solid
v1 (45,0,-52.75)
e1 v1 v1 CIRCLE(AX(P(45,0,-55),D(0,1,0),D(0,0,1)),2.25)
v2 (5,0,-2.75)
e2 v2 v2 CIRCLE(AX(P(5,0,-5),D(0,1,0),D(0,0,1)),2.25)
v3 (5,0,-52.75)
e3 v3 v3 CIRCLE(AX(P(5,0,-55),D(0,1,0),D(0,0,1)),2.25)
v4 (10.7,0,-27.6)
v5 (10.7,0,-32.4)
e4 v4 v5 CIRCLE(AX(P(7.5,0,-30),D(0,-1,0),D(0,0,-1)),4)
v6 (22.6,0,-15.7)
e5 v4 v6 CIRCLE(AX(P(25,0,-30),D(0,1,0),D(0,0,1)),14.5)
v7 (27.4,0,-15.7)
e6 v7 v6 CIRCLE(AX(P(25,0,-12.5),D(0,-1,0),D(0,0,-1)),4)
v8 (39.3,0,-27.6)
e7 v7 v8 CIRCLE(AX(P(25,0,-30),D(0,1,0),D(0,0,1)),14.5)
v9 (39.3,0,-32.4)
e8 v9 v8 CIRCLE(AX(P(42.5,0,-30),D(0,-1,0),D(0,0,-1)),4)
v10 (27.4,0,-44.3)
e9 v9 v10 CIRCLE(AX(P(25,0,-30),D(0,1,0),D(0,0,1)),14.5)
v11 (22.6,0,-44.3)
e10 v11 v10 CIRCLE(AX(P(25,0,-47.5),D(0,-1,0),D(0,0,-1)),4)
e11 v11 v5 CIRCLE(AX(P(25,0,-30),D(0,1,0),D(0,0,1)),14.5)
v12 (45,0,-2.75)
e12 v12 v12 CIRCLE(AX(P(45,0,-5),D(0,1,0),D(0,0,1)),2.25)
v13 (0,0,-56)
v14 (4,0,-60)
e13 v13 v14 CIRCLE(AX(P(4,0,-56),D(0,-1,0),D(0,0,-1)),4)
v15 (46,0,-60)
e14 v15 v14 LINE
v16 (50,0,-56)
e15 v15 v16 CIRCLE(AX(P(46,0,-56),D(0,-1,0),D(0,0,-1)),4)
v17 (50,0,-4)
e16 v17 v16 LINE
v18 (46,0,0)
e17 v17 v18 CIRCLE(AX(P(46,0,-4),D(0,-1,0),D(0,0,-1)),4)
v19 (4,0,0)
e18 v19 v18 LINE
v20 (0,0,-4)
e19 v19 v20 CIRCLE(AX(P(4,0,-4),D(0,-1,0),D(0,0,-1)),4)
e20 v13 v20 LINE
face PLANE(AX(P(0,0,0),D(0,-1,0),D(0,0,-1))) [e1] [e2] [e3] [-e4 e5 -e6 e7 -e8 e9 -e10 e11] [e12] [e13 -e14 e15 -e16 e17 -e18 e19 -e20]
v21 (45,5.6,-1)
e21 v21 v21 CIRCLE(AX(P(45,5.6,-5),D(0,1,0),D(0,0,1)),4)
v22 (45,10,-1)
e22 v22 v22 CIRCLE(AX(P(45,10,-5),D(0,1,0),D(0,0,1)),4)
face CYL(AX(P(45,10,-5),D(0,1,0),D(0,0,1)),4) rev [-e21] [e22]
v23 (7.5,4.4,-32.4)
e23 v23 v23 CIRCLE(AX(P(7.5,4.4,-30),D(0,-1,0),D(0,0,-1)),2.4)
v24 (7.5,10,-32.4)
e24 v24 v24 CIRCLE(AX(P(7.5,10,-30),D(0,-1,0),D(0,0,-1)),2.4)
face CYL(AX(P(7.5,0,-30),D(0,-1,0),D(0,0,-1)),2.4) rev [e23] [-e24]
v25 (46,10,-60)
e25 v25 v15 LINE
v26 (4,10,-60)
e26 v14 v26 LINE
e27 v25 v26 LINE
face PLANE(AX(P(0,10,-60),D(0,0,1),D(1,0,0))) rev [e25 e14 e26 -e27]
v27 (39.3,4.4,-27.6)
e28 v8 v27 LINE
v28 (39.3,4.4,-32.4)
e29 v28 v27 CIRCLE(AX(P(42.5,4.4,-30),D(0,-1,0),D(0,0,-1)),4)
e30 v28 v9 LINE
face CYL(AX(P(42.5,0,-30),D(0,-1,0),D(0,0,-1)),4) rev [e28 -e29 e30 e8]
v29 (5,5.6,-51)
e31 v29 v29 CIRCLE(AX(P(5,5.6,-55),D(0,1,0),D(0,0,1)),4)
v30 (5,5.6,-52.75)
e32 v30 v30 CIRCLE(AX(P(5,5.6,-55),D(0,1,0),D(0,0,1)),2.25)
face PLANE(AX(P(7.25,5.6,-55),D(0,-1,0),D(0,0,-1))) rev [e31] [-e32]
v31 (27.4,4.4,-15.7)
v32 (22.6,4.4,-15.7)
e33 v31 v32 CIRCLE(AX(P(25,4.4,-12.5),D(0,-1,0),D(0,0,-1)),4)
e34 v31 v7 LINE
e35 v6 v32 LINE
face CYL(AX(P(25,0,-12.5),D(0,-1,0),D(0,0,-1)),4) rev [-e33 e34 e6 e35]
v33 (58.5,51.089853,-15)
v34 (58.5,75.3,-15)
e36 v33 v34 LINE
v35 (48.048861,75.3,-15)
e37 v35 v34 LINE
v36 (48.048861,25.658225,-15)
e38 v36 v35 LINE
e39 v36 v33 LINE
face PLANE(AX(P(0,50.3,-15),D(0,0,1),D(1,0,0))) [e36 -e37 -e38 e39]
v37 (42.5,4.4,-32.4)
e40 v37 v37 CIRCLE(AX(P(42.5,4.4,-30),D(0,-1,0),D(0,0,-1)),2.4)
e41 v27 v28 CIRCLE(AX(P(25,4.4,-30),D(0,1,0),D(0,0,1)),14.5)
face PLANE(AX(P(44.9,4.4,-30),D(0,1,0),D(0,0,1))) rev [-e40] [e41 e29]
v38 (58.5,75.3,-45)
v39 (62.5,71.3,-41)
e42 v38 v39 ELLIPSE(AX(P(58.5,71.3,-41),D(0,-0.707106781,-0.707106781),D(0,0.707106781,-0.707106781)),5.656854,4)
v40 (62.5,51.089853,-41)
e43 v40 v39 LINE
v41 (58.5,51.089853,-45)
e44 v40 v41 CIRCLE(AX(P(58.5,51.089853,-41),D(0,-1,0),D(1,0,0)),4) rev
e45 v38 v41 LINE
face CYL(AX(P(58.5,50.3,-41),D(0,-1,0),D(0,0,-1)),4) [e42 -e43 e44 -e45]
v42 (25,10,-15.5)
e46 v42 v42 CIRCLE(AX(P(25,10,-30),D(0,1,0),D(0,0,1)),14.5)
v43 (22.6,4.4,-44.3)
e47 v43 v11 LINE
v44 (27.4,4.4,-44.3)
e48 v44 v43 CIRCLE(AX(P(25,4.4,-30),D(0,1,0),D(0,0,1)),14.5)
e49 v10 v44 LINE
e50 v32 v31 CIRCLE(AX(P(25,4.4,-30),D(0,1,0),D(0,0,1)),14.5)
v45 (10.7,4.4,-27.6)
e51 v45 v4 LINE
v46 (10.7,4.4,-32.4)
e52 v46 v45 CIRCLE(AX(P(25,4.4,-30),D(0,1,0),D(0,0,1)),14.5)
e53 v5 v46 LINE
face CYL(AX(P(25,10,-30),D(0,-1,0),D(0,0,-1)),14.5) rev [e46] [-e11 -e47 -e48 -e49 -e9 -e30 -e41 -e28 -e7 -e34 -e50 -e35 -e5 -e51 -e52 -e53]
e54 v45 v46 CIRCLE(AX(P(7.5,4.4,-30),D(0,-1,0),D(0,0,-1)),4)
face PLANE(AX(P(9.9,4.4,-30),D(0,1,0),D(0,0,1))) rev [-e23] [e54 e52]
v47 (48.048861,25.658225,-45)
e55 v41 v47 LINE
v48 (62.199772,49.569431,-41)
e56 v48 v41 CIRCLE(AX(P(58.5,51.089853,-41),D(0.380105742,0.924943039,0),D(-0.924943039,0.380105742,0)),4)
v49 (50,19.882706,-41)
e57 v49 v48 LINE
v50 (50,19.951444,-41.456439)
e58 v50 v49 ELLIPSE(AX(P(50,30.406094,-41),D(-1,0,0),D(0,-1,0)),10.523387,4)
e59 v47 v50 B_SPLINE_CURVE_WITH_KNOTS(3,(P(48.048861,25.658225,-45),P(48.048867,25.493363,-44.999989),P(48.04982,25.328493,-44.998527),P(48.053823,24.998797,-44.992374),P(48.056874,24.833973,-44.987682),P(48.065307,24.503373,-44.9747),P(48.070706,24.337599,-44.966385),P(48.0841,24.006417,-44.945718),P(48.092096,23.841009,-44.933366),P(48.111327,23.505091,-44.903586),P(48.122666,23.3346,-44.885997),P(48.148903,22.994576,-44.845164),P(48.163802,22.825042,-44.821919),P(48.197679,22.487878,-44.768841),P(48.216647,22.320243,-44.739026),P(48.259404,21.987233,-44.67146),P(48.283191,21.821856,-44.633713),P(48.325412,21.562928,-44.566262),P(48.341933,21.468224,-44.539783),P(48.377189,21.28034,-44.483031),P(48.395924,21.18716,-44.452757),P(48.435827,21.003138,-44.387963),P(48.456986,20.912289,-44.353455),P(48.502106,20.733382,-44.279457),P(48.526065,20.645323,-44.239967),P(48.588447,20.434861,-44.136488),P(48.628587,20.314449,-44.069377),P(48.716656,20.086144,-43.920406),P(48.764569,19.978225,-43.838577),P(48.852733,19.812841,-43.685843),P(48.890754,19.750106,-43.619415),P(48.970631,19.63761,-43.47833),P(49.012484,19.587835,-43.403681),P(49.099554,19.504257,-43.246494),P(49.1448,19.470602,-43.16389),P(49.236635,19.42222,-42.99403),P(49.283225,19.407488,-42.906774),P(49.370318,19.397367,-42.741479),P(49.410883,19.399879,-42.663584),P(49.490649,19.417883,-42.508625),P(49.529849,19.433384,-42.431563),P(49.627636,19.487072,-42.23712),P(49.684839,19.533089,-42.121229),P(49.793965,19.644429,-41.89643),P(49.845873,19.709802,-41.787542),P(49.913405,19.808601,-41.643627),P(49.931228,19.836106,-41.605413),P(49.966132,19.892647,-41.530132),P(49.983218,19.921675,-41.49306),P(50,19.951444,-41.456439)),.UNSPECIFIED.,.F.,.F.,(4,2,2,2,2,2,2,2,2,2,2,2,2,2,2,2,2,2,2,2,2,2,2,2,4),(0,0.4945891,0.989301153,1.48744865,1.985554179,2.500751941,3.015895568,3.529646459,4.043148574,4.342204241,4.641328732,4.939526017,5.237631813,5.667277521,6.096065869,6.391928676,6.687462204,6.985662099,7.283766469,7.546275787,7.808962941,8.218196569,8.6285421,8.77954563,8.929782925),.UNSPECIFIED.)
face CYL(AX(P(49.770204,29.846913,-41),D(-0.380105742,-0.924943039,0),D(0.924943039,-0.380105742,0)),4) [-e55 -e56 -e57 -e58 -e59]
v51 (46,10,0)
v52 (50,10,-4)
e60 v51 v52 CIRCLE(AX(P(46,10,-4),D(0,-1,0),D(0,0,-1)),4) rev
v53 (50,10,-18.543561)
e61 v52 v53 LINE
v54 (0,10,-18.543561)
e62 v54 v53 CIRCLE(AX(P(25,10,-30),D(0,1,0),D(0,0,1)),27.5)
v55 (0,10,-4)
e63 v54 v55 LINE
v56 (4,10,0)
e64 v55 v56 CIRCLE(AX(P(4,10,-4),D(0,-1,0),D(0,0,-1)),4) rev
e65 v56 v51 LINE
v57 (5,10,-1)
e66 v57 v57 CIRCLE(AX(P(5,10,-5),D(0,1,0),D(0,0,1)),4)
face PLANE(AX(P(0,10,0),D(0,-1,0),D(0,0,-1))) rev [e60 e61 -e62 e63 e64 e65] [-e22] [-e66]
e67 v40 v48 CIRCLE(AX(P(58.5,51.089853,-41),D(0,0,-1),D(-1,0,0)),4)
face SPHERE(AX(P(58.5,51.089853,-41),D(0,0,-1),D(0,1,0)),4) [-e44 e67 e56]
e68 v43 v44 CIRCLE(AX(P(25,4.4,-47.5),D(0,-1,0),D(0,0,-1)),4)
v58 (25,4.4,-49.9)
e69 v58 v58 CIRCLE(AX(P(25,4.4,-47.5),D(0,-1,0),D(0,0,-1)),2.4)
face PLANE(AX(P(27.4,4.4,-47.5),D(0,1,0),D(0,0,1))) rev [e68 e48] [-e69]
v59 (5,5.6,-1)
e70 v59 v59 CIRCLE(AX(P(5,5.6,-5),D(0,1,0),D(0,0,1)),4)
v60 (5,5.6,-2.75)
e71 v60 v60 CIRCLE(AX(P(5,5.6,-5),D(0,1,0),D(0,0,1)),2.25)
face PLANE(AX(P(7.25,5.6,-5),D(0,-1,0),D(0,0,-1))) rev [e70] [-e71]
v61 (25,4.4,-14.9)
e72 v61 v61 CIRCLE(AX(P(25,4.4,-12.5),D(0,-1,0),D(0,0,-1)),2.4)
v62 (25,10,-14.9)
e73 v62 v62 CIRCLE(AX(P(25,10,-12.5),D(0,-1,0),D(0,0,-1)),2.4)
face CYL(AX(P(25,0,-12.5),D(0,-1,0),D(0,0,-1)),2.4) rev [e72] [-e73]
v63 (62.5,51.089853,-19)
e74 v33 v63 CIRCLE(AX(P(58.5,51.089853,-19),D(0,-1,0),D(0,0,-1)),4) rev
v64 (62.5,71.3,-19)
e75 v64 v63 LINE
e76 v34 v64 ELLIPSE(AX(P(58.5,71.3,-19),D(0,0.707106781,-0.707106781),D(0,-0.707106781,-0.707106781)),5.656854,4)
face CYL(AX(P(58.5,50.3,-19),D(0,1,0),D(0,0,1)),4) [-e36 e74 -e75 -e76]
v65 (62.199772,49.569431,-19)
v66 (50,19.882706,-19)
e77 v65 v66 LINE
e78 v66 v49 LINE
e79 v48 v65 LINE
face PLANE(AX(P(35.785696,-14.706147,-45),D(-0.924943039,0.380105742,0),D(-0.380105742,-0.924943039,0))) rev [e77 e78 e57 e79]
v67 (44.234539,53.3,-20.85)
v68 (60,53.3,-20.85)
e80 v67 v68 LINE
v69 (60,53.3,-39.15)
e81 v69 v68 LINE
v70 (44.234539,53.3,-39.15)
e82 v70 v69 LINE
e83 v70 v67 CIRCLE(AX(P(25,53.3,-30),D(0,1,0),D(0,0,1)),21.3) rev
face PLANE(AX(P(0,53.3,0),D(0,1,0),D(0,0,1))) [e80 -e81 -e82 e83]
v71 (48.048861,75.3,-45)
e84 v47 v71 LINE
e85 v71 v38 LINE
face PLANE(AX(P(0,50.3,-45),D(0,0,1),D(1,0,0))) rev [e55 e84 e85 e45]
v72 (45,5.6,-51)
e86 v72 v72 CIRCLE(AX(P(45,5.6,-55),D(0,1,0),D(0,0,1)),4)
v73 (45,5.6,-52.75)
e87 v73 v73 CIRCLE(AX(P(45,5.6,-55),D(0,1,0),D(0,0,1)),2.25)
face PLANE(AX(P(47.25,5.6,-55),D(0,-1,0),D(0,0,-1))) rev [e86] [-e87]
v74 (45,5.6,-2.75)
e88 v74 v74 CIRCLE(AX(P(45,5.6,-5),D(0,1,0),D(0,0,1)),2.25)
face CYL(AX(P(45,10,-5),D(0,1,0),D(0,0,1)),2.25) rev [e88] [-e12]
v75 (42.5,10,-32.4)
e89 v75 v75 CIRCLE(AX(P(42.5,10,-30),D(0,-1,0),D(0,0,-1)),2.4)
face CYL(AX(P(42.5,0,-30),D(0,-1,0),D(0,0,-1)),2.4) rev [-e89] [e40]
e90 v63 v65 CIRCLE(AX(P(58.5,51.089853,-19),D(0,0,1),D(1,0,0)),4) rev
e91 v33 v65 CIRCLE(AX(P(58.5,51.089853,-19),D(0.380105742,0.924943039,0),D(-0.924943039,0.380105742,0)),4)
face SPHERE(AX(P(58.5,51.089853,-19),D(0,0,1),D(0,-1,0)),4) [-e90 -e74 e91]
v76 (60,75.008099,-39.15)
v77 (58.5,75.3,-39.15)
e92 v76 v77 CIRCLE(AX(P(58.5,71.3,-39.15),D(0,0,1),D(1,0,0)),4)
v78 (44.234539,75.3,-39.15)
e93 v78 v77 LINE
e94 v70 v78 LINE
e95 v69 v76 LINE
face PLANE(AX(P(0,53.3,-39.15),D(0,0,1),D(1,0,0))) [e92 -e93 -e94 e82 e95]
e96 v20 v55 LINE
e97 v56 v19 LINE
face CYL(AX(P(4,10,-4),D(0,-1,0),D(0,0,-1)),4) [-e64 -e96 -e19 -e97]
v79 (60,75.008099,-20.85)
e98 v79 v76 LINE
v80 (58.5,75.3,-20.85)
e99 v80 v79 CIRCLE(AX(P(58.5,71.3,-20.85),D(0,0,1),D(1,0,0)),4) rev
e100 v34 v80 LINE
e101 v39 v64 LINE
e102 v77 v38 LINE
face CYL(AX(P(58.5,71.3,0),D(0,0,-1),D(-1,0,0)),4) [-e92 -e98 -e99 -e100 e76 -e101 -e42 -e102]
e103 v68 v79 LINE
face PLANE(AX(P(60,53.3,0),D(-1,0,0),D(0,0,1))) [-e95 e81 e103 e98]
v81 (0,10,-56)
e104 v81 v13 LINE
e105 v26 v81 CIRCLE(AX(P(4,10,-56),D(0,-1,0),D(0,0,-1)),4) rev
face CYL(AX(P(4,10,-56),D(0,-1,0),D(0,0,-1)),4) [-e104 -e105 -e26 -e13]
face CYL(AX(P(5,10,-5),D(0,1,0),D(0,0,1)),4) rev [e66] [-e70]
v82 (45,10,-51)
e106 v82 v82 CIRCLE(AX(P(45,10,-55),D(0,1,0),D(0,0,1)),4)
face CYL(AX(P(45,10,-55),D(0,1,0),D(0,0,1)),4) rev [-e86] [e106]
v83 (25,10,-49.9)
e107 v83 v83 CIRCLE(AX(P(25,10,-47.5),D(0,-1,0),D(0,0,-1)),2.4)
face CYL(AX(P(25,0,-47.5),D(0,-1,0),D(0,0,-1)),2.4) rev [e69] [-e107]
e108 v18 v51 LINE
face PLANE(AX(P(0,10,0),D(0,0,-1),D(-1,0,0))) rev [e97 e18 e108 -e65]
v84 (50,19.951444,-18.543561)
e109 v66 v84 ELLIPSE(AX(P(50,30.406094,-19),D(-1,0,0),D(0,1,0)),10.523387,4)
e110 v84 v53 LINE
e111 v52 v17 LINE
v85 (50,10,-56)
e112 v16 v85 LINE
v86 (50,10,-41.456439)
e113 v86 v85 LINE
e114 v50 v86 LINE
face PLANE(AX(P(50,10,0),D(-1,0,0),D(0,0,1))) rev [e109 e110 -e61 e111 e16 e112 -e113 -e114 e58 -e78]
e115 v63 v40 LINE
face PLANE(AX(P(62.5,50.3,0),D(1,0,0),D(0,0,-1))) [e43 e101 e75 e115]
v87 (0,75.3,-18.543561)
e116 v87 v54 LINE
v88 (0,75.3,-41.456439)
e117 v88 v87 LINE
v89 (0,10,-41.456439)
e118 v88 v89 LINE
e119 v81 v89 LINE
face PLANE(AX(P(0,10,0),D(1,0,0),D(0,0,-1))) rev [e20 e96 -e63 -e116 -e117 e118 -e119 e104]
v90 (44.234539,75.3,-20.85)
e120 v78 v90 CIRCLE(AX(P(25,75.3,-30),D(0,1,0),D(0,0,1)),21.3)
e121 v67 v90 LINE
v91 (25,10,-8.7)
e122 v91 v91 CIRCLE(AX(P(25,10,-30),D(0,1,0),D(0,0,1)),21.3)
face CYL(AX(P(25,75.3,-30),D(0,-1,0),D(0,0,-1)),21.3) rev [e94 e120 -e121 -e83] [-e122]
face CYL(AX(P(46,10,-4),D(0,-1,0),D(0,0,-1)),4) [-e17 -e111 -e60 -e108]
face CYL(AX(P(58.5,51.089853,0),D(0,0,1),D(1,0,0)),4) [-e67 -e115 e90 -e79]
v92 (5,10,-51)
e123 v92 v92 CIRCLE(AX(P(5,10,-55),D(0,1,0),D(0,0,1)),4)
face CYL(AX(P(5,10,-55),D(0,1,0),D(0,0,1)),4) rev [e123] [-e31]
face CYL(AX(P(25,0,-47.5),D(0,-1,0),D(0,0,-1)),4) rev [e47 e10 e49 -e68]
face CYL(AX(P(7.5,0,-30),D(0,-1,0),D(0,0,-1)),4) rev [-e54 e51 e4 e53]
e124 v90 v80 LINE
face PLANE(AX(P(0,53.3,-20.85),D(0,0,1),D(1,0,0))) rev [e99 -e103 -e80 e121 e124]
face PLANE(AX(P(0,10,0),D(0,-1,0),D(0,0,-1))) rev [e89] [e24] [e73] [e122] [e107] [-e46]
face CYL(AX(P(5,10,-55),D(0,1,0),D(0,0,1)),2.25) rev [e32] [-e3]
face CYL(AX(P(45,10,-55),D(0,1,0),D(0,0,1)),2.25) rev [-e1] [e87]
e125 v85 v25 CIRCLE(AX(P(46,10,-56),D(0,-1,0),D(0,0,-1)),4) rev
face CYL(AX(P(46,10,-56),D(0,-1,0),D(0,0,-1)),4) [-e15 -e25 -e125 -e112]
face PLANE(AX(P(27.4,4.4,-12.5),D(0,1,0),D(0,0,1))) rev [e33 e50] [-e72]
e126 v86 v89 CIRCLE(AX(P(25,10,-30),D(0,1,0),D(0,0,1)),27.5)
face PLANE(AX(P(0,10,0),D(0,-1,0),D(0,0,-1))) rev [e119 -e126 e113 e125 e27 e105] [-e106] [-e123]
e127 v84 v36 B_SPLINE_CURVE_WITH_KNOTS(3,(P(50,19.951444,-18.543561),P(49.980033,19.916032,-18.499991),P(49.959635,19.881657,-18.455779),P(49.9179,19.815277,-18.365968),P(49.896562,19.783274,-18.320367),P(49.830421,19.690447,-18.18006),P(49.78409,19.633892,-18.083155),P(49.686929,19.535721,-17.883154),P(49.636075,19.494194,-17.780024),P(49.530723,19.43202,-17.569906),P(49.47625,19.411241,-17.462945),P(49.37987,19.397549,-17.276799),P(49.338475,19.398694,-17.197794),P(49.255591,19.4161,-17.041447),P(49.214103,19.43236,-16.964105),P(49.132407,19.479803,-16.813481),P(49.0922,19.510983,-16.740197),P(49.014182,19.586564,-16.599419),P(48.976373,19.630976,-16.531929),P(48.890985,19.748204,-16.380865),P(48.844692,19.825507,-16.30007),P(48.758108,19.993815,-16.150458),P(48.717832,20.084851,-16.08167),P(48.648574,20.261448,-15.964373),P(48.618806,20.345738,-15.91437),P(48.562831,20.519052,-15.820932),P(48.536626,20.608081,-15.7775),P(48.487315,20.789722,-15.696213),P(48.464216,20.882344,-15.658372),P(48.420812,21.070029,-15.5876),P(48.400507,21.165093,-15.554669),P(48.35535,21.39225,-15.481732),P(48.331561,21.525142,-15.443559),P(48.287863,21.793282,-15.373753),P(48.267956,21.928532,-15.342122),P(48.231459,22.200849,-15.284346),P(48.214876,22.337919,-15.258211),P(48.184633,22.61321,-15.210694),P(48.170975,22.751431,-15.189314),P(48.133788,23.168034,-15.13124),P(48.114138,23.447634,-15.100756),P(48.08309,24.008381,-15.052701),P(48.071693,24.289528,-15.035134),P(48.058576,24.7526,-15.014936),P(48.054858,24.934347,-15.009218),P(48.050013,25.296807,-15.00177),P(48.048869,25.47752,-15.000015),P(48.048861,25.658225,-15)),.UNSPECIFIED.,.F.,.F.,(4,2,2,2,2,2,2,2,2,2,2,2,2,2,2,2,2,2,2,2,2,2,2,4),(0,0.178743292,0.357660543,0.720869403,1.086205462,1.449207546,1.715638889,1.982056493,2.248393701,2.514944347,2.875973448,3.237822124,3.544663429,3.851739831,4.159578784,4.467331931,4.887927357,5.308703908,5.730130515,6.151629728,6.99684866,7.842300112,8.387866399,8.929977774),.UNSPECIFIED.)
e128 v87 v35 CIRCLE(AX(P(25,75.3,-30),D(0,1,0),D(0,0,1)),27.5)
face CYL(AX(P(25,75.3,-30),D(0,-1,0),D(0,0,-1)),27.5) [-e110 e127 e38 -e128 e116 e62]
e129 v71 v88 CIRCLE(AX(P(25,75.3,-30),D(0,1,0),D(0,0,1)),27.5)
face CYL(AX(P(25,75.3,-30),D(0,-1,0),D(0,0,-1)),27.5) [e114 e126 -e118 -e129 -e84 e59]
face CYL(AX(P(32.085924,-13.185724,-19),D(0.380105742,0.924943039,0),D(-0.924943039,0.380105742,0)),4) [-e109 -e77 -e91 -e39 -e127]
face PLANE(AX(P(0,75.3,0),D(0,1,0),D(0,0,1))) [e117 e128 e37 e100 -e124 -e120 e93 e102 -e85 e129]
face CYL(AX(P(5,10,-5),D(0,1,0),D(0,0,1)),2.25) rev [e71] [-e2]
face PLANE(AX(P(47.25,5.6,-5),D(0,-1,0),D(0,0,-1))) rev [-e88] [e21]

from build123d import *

# Parameters (mm, degrees)
ESQUISSE1_W                                       = 50
ESQUISSE1_H                                       = 60
ESQUISSE1_R                                       = 14.5
BOSS_EXTRU_1_DEPTH                                = 10
ESQUISSE2_R                                       = 21.3
BOSS_EXTRU_2_DEPTH                                = 65.3
BOSS_EXTRU_3_START                                = -25
BOSS_EXTRU_3_DEPTH                                = 25
ENL_V_START                                       = 22
ENL_V_MAT_EXTRU_1_DEPTH                           = 22
CHAMBRAGE_POUR_VIS_SIX_PANS_CREUX_M41_D           = 4.5
CHAMBRAGE_POUR_VIS_SIX_PANS_CREUX_M41_CBORE_D     = 8
CHAMBRAGE_POUR_VIS_SIX_PANS_CREUX_M41_CBORE_DEPTH = 4.4
CHAMBRAGE_POUR_VIS_SIX_PANS_CREUX_M42_D           = 4.8
CHAMBRAGE_POUR_VIS_SIX_PANS_CREUX_M42_CBORE_D     = 8
CHAMBRAGE_POUR_VIS_SIX_PANS_CREUX_M42_CBORE_DEPTH = 4.4
BOSS_EXTRU_4_DEPTH                                = 30
CONG_1_R                                          = 4
CONG_2_R                                          = 4


with BuildPart() as part:
    # Esquisse1 → Boss.-Extru.1 (new body)
    with BuildSketch(Plane(origin=(0, 0, 0), x_dir=(1, 0, 0), z_dir=(0, 1, 0))):
        with Locations((25, 30)):
            Rectangle(ESQUISSE1_W, ESQUISSE1_H)
        with Locations(Location((25, 30, 0), (0, 0, 270))):
            Circle(ESQUISSE1_R, mode=Mode.SUBTRACT)
    extrude(amount=BOSS_EXTRU_1_DEPTH)

    # Esquisse2 → Boss.-Extru.2 (add)
    with BuildSketch(Plane(origin=(0, 10, 0), x_dir=(1, 0, 0), z_dir=(0, 1, 0))):
        with BuildLine():
            ThreePointArc((50, 41.456439237), (25, 57.5), (0, 41.456439237))
            Line((0, 41.456439237), (0, 18.543560763))
            ThreePointArc((0, 18.543560763), (25, 2.5), (50, 18.543560763))
            Line((50, 18.543560763), (50, 41.456439237))
        make_face()
        with Locations(Location((25, 30, 0), (0, 0, 270))):
            Circle(ESQUISSE2_R, mode=Mode.SUBTRACT)
    extrude(amount=BOSS_EXTRU_2_DEPTH)

    # Esquisse3 → Boss.-Extru.3 (add)
    with BuildSketch(Plane(origin=(0, 75.3, 0), x_dir=(1, 0, 0), z_dir=(0, 1, 0)).offset(BOSS_EXTRU_3_START)):
        with BuildLine():
            ThreePointArc((50, 18.543560763), (49.08967559, 16.735855475), (48.048861143, 15))
            Line((48.048861143, 15), (62.5, 15))
            Line((62.5, 15), (62.5, 45))
            Line((62.5, 45), (48.048861143, 45))
            ThreePointArc((48.048861143, 45), (49.08967559, 43.264144525), (50, 41.456439237))
            ThreePointArc((50, 41.456439237), (51.867731575, 35.8630197), (52.5, 30))
            ThreePointArc((52.5, 30), (51.867731575, 24.1369803), (50, 18.543560763))
        make_face()
        with BuildLine():
            Line((50, 41.456439237), (50, 18.543560763))
            ThreePointArc((50, 18.543560763), (51.867731575, 24.1369803), (52.5, 30))
            ThreePointArc((52.5, 30), (51.867731575, 35.8630197), (50, 41.456439237))
        make_face()
    extrude(amount=BOSS_EXTRU_3_DEPTH)

    # Esquisse4 → Enlèv. mat.-Extru.1 (cut)
    with BuildSketch(Plane(origin=(0, 75.3, -75.3), x_dir=(1, 0, 0), z_dir=(0, -1, 0)).offset(ENL_V_START)):
        with BuildLine():
            ThreePointArc((46.3, 45.3), (45.777219327, 40.609887311), (44.234539246, 36.15))
            Line((44.234539246, 36.15), (60, 36.15))
            Line((60, 36.15), (60, 54.45))
            Line((60, 54.45), (44.234539246, 54.45))
            ThreePointArc((44.234539246, 54.45), (45.777219327, 49.990112689), (46.3, 45.3))
        make_face()
    extrude(amount=-ENL_V_MAT_EXTRU_1_DEPTH, mode=Mode.SUBTRACT)

    # Chambrage pour vis à six pans creux M41 (through all)
    with Locations(Plane(origin=(5, 10, -55), x_dir=(0, 0, 1), z_dir=(0, 1, 0))):
        with Locations((0, 0), (0, 40), (50, 40), (50, 0)):
            CounterBoreHole(CHAMBRAGE_POUR_VIS_SIX_PANS_CREUX_M41_D / 2, CHAMBRAGE_POUR_VIS_SIX_PANS_CREUX_M41_CBORE_D / 2, CHAMBRAGE_POUR_VIS_SIX_PANS_CREUX_M41_CBORE_DEPTH)

    # Chambrage pour vis à six pans creux M42 (through all)
    with Locations(Plane(origin=(25, 0, -12.5), x_dir=(0, 0, -1), z_dir=(0, -1, 0))):
        with Locations((0, 0), (17.5, 17.5), (35, 0), (17.5, -17.5)):
            CounterBoreHole(CHAMBRAGE_POUR_VIS_SIX_PANS_CREUX_M42_D / 2, CHAMBRAGE_POUR_VIS_SIX_PANS_CREUX_M42_CBORE_D / 2, CHAMBRAGE_POUR_VIS_SIX_PANS_CREUX_M42_CBORE_DEPTH)

    # Esquisse11 → Boss.-Extru.4 (add)
    with BuildSketch(Plane.XY.offset(-15)):
        Polygon((48.048861143, 50.3), (48.048861143, 15.134837214), (62.5, 50.3), align=None)
    extrude(amount=-BOSS_EXTRU_4_DEPTH)

    # Congé1
    cong_1_edges = [part.edges().sort_by_distance(p)[0] for p in [
        (0, 5, -60),
        (50, 5, -60),
        (50, 5, 0),
        (0, 5, 0),
    ]]
    fillet(cong_1_edges, radius=CONG_1_R)

    # Congé2
    # the kernel refuses this fillet: 4 mm, written as the material it takes off along each edge
    with BuildSketch(Plane(origin=(58.5, 51.089853485, -41), x_dir=(1, 0, 0), z_dir=(0, 0, -1))) as cong_2_piece_1_section:
        Polygon((0, 0), (CONG_2_R, 0), (CONG_2_R, CONG_2_R * 0.197463371222), (CONG_2_R * 0.924943038794, CONG_2_R * 0.38010574185), align=None)
    cong_2_piece_1 = extrude(amount=CONG_2_R, mode=Mode.PRIVATE)
    cong_2_piece_1 = cong_2_piece_1 - Plane(origin=(58.5, 51.089853485, -41), x_dir=(-0.9810563283506197, 0.19372268995448388, 0), z_dir=(0, 0, -1)) * Sphere(CONG_2_R, mode=Mode.PRIVATE)
    add(cong_2_piece_1, mode=Mode.SUBTRACT)
    with BuildSketch(Plane(origin=(58.5, 51.089853485, -19), x_dir=(1, 0, 0), z_dir=(0, 0, 1))) as cong_2_piece_2_section:
        Polygon((0, 0), (CONG_2_R, 0), (CONG_2_R, -CONG_2_R * 0.197463371222), (CONG_2_R * 0.924943038794, -CONG_2_R * 0.38010574185), align=None)
    cong_2_piece_2 = extrude(amount=CONG_2_R, mode=Mode.PRIVATE)
    cong_2_piece_2 = cong_2_piece_2 - Plane(origin=(58.5, 51.089853485, -19), x_dir=(-0.9810563283506197, 0.19372268995448388, 0), z_dir=(0, 0, 1)) * Sphere(CONG_2_R, mode=Mode.PRIVATE)
    add(cong_2_piece_2, mode=Mode.SUBTRACT)
    with BuildSketch(Plane(origin=(62.5, 51.089853485, -45), x_dir=(-1, 0, 0), z_dir=(0, 1, 0))) as cong_2_piece_3:
        with BuildLine():
            CenterArc((CONG_2_R, CONG_2_R), CONG_2_R, 180, 90)
            Line((0, CONG_2_R), (0, 0))
            Line((0, 0), (CONG_2_R, 0))
        make_face()
    extrude(amount=34.210146515, mode=Mode.SUBTRACT)
    with BuildSketch(Plane(origin=(62.5, 50.3, -19), x_dir=(-0.3801057418499003, -0.9249430387935988, 0), z_dir=(0, 0, -1))) as cong_2_piece_4:
        with BuildLine():
            CenterArc((CONG_2_R * 0.197463371222, CONG_2_R), CONG_2_R, 247.659767296, 22.340232704)
            Line((-CONG_2_R * 0.182642370628, CONG_2_R * 0.0750569612064), (0, 0))
            Line((0, 0), (CONG_2_R * 0.197463371222, 0))
        make_face()
    extrude(amount=22, mode=Mode.SUBTRACT)
    with BuildSketch(Plane(origin=(62.5, 51.089853485, -15), x_dir=(-1, 0, 0), z_dir=(0, 1, 0))) as cong_2_piece_5:
        with BuildLine():
            CenterArc((CONG_2_R, -CONG_2_R), CONG_2_R, 90, 90)
            Line((0, -CONG_2_R), (0, 0))
            Line((0, 0), (CONG_2_R, 0))
        make_face()
    extrude(amount=34.210146515, mode=Mode.SUBTRACT)
    with BuildSketch(Plane(origin=(62.5, 75.3, -5), x_dir=(-1, 0, 0), z_dir=(0, 0, -1))) as cong_2_piece_6:
        with BuildLine():
            CenterArc((CONG_2_R, -CONG_2_R), CONG_2_R, 90, 90)
            Line((0, -CONG_2_R), (0, 0))
            Line((0, 0), (CONG_2_R, 0))
        make_face()
    extrude(amount=50, mode=Mode.SUBTRACT)
    with BuildSketch(Plane(origin=(44.247803725, 5.885406826, -45), x_dir=(0, 0, 1), z_dir=(0.38010574184990287, 0.9249430387935978, 0))) as cong_2_piece_7_section:
        with BuildLine():
            CenterArc((CONG_2_R, -CONG_2_R), CONG_2_R, 90, 90)
            Line((0, -CONG_2_R), (0, 0))
            Line((0, 0), (CONG_2_R, 0))
        make_face()
    cong_2_piece_7 = extrude(amount=47.228879898, mode=Mode.PRIVATE)
    cong_2_piece_7 = split(cong_2_piece_7, bisect_by=Plane(origin=(50, 20.820652224, -44.39379807), z_dir=(-1, 0, 0)), keep=Keep.TOP, mode=Mode.PRIVATE)
    cong_2_piece_7 = cong_2_piece_7 - Plane(origin=(25, 20.820652224, -30), x_dir=(0.909090909090922, 0, -0.4165977904505028), z_dir=(0, -1, 0)) * Cylinder(27.5, 111, mode=Mode.PRIVATE)
    add(cong_2_piece_7, mode=Mode.SUBTRACT)
    with BuildSketch(Plane(origin=(44.247803725, 5.885406826, -45), x_dir=(0, 0, 1), z_dir=(0.38010574184990287, 0.9249430387935978, 0))) as cong_2_piece_8_section:
        with BuildLine():
            CenterArc((CONG_2_R, -CONG_2_R), CONG_2_R, 90, 90)
            Line((0, -CONG_2_R), (0, 0))
            Line((0, 0), (CONG_2_R, 0))
        make_face()
    cong_2_piece_8 = extrude(amount=47.228879898, mode=Mode.PRIVATE)
    cong_2_piece_8 = split(cong_2_piece_8, bisect_by=Plane(origin=(50, 19.946502093, -41.15906608), z_dir=(1, 0, 0)), keep=Keep.TOP, mode=Mode.PRIVATE)
    cong_2_piece_8 = cong_2_piece_8 & Plane(origin=(25, 19.946502093, -30), x_dir=(0.909090909090922, 0, -0.4165977904505028), z_dir=(0, -1, 0)) * Cylinder(27.5, 111, mode=Mode.PRIVATE)
    add(cong_2_piece_8, mode=Mode.SUBTRACT)
    with BuildSketch(Plane(origin=(44.247803725, 5.885406826, -45), x_dir=(0, 0, 1), z_dir=(0.38010574184990287, 0.9249430387935978, 0))) as cong_2_piece_9_section:
        with BuildLine():
            CenterArc((CONG_2_R, -CONG_2_R), CONG_2_R, 90, 90)
            Line((0, -CONG_2_R), (0, 0))
            Line((0, 0), (CONG_2_R, 0))
        make_face()
    cong_2_piece_9 = extrude(amount=47.228879898, mode=Mode.PRIVATE)
    cong_2_piece_9 = split(cong_2_piece_9, bisect_by=Plane(origin=(50, 35.999636331, -44.058905406), z_dir=(1, 0, 0)), keep=Keep.TOP, mode=Mode.PRIVATE)
    cong_2_piece_9 = cong_2_piece_9 - Plane(origin=(25, 35.999636331, -30), x_dir=(0.909090909090922, 0, -0.4165977904505028), z_dir=(0, -1, 0)) * Cylinder(27.5, 111, mode=Mode.PRIVATE)
    add(cong_2_piece_9, mode=Mode.SUBTRACT)
    with BuildSketch(Plane(origin=(44.247803725, 5.885406826, -15), x_dir=(0, 0, -1), z_dir=(0.38010574184990287, 0.9249430387935978, 0))) as cong_2_piece_10_section:
        with BuildLine():
            CenterArc((CONG_2_R, CONG_2_R), CONG_2_R, 180, 90)
            Line((0, CONG_2_R), (0, 0))
            Line((0, 0), (CONG_2_R, 0))
        make_face()
    cong_2_piece_10 = extrude(amount=47.228879898, mode=Mode.PRIVATE)
    cong_2_piece_10 = split(cong_2_piece_10, bisect_by=Plane(origin=(50, 20.820650569, -15.60620042), z_dir=(-1, 0, 0)), keep=Keep.TOP, mode=Mode.PRIVATE)
    cong_2_piece_10 = cong_2_piece_10 - Plane(origin=(25, 20.820650569, -30), x_dir=(-0.9090909090909031, 0, 0.4165977904505442), z_dir=(0, -1, 0)) * Cylinder(27.5, 111, mode=Mode.PRIVATE)
    add(cong_2_piece_10, mode=Mode.SUBTRACT)
    with BuildSketch(Plane(origin=(44.247803725, 5.885406826, -15), x_dir=(0, 0, -1), z_dir=(0.38010574184990287, 0.9249430387935978, 0))) as cong_2_piece_11_section:
        with BuildLine():
            CenterArc((CONG_2_R, CONG_2_R), CONG_2_R, 180, 90)
            Line((0, CONG_2_R), (0, 0))
            Line((0, 0), (CONG_2_R, 0))
        make_face()
    cong_2_piece_11 = extrude(amount=47.228879898, mode=Mode.PRIVATE)
    cong_2_piece_11 = split(cong_2_piece_11, bisect_by=Plane(origin=(50, 19.946502096, -18.840933919), z_dir=(1, 0, 0)), keep=Keep.TOP, mode=Mode.PRIVATE)
    cong_2_piece_11 = cong_2_piece_11 & Plane(origin=(25, 19.946502096, -30), x_dir=(-0.9090909090909031, 0, 0.4165977904505442), z_dir=(0, -1, 0)) * Cylinder(27.5, 111, mode=Mode.PRIVATE)
    add(cong_2_piece_11, mode=Mode.SUBTRACT)
    with BuildSketch(Plane(origin=(44.247803725, 5.885406826, -15), x_dir=(0, 0, -1), z_dir=(0.38010574184990287, 0.9249430387935978, 0))) as cong_2_piece_12_section:
        with BuildLine():
            CenterArc((CONG_2_R, CONG_2_R), CONG_2_R, 180, 90)
            Line((0, CONG_2_R), (0, 0))
            Line((0, 0), (CONG_2_R, 0))
        make_face()
    cong_2_piece_12 = extrude(amount=47.228879898, mode=Mode.PRIVATE)
    cong_2_piece_12 = split(cong_2_piece_12, bisect_by=Plane(origin=(50, 35.999636337, -15.941094594), z_dir=(1, 0, 0)), keep=Keep.TOP, mode=Mode.PRIVATE)
    cong_2_piece_12 = cong_2_piece_12 - Plane(origin=(25, 35.999636337, -30), x_dir=(-0.9090909090909031, 0, 0.4165977904505442), z_dir=(0, -1, 0)) * Cylinder(27.5, 111, mode=Mode.PRIVATE)
    add(cong_2_piece_12, mode=Mode.SUBTRACT)


solid = part.part
